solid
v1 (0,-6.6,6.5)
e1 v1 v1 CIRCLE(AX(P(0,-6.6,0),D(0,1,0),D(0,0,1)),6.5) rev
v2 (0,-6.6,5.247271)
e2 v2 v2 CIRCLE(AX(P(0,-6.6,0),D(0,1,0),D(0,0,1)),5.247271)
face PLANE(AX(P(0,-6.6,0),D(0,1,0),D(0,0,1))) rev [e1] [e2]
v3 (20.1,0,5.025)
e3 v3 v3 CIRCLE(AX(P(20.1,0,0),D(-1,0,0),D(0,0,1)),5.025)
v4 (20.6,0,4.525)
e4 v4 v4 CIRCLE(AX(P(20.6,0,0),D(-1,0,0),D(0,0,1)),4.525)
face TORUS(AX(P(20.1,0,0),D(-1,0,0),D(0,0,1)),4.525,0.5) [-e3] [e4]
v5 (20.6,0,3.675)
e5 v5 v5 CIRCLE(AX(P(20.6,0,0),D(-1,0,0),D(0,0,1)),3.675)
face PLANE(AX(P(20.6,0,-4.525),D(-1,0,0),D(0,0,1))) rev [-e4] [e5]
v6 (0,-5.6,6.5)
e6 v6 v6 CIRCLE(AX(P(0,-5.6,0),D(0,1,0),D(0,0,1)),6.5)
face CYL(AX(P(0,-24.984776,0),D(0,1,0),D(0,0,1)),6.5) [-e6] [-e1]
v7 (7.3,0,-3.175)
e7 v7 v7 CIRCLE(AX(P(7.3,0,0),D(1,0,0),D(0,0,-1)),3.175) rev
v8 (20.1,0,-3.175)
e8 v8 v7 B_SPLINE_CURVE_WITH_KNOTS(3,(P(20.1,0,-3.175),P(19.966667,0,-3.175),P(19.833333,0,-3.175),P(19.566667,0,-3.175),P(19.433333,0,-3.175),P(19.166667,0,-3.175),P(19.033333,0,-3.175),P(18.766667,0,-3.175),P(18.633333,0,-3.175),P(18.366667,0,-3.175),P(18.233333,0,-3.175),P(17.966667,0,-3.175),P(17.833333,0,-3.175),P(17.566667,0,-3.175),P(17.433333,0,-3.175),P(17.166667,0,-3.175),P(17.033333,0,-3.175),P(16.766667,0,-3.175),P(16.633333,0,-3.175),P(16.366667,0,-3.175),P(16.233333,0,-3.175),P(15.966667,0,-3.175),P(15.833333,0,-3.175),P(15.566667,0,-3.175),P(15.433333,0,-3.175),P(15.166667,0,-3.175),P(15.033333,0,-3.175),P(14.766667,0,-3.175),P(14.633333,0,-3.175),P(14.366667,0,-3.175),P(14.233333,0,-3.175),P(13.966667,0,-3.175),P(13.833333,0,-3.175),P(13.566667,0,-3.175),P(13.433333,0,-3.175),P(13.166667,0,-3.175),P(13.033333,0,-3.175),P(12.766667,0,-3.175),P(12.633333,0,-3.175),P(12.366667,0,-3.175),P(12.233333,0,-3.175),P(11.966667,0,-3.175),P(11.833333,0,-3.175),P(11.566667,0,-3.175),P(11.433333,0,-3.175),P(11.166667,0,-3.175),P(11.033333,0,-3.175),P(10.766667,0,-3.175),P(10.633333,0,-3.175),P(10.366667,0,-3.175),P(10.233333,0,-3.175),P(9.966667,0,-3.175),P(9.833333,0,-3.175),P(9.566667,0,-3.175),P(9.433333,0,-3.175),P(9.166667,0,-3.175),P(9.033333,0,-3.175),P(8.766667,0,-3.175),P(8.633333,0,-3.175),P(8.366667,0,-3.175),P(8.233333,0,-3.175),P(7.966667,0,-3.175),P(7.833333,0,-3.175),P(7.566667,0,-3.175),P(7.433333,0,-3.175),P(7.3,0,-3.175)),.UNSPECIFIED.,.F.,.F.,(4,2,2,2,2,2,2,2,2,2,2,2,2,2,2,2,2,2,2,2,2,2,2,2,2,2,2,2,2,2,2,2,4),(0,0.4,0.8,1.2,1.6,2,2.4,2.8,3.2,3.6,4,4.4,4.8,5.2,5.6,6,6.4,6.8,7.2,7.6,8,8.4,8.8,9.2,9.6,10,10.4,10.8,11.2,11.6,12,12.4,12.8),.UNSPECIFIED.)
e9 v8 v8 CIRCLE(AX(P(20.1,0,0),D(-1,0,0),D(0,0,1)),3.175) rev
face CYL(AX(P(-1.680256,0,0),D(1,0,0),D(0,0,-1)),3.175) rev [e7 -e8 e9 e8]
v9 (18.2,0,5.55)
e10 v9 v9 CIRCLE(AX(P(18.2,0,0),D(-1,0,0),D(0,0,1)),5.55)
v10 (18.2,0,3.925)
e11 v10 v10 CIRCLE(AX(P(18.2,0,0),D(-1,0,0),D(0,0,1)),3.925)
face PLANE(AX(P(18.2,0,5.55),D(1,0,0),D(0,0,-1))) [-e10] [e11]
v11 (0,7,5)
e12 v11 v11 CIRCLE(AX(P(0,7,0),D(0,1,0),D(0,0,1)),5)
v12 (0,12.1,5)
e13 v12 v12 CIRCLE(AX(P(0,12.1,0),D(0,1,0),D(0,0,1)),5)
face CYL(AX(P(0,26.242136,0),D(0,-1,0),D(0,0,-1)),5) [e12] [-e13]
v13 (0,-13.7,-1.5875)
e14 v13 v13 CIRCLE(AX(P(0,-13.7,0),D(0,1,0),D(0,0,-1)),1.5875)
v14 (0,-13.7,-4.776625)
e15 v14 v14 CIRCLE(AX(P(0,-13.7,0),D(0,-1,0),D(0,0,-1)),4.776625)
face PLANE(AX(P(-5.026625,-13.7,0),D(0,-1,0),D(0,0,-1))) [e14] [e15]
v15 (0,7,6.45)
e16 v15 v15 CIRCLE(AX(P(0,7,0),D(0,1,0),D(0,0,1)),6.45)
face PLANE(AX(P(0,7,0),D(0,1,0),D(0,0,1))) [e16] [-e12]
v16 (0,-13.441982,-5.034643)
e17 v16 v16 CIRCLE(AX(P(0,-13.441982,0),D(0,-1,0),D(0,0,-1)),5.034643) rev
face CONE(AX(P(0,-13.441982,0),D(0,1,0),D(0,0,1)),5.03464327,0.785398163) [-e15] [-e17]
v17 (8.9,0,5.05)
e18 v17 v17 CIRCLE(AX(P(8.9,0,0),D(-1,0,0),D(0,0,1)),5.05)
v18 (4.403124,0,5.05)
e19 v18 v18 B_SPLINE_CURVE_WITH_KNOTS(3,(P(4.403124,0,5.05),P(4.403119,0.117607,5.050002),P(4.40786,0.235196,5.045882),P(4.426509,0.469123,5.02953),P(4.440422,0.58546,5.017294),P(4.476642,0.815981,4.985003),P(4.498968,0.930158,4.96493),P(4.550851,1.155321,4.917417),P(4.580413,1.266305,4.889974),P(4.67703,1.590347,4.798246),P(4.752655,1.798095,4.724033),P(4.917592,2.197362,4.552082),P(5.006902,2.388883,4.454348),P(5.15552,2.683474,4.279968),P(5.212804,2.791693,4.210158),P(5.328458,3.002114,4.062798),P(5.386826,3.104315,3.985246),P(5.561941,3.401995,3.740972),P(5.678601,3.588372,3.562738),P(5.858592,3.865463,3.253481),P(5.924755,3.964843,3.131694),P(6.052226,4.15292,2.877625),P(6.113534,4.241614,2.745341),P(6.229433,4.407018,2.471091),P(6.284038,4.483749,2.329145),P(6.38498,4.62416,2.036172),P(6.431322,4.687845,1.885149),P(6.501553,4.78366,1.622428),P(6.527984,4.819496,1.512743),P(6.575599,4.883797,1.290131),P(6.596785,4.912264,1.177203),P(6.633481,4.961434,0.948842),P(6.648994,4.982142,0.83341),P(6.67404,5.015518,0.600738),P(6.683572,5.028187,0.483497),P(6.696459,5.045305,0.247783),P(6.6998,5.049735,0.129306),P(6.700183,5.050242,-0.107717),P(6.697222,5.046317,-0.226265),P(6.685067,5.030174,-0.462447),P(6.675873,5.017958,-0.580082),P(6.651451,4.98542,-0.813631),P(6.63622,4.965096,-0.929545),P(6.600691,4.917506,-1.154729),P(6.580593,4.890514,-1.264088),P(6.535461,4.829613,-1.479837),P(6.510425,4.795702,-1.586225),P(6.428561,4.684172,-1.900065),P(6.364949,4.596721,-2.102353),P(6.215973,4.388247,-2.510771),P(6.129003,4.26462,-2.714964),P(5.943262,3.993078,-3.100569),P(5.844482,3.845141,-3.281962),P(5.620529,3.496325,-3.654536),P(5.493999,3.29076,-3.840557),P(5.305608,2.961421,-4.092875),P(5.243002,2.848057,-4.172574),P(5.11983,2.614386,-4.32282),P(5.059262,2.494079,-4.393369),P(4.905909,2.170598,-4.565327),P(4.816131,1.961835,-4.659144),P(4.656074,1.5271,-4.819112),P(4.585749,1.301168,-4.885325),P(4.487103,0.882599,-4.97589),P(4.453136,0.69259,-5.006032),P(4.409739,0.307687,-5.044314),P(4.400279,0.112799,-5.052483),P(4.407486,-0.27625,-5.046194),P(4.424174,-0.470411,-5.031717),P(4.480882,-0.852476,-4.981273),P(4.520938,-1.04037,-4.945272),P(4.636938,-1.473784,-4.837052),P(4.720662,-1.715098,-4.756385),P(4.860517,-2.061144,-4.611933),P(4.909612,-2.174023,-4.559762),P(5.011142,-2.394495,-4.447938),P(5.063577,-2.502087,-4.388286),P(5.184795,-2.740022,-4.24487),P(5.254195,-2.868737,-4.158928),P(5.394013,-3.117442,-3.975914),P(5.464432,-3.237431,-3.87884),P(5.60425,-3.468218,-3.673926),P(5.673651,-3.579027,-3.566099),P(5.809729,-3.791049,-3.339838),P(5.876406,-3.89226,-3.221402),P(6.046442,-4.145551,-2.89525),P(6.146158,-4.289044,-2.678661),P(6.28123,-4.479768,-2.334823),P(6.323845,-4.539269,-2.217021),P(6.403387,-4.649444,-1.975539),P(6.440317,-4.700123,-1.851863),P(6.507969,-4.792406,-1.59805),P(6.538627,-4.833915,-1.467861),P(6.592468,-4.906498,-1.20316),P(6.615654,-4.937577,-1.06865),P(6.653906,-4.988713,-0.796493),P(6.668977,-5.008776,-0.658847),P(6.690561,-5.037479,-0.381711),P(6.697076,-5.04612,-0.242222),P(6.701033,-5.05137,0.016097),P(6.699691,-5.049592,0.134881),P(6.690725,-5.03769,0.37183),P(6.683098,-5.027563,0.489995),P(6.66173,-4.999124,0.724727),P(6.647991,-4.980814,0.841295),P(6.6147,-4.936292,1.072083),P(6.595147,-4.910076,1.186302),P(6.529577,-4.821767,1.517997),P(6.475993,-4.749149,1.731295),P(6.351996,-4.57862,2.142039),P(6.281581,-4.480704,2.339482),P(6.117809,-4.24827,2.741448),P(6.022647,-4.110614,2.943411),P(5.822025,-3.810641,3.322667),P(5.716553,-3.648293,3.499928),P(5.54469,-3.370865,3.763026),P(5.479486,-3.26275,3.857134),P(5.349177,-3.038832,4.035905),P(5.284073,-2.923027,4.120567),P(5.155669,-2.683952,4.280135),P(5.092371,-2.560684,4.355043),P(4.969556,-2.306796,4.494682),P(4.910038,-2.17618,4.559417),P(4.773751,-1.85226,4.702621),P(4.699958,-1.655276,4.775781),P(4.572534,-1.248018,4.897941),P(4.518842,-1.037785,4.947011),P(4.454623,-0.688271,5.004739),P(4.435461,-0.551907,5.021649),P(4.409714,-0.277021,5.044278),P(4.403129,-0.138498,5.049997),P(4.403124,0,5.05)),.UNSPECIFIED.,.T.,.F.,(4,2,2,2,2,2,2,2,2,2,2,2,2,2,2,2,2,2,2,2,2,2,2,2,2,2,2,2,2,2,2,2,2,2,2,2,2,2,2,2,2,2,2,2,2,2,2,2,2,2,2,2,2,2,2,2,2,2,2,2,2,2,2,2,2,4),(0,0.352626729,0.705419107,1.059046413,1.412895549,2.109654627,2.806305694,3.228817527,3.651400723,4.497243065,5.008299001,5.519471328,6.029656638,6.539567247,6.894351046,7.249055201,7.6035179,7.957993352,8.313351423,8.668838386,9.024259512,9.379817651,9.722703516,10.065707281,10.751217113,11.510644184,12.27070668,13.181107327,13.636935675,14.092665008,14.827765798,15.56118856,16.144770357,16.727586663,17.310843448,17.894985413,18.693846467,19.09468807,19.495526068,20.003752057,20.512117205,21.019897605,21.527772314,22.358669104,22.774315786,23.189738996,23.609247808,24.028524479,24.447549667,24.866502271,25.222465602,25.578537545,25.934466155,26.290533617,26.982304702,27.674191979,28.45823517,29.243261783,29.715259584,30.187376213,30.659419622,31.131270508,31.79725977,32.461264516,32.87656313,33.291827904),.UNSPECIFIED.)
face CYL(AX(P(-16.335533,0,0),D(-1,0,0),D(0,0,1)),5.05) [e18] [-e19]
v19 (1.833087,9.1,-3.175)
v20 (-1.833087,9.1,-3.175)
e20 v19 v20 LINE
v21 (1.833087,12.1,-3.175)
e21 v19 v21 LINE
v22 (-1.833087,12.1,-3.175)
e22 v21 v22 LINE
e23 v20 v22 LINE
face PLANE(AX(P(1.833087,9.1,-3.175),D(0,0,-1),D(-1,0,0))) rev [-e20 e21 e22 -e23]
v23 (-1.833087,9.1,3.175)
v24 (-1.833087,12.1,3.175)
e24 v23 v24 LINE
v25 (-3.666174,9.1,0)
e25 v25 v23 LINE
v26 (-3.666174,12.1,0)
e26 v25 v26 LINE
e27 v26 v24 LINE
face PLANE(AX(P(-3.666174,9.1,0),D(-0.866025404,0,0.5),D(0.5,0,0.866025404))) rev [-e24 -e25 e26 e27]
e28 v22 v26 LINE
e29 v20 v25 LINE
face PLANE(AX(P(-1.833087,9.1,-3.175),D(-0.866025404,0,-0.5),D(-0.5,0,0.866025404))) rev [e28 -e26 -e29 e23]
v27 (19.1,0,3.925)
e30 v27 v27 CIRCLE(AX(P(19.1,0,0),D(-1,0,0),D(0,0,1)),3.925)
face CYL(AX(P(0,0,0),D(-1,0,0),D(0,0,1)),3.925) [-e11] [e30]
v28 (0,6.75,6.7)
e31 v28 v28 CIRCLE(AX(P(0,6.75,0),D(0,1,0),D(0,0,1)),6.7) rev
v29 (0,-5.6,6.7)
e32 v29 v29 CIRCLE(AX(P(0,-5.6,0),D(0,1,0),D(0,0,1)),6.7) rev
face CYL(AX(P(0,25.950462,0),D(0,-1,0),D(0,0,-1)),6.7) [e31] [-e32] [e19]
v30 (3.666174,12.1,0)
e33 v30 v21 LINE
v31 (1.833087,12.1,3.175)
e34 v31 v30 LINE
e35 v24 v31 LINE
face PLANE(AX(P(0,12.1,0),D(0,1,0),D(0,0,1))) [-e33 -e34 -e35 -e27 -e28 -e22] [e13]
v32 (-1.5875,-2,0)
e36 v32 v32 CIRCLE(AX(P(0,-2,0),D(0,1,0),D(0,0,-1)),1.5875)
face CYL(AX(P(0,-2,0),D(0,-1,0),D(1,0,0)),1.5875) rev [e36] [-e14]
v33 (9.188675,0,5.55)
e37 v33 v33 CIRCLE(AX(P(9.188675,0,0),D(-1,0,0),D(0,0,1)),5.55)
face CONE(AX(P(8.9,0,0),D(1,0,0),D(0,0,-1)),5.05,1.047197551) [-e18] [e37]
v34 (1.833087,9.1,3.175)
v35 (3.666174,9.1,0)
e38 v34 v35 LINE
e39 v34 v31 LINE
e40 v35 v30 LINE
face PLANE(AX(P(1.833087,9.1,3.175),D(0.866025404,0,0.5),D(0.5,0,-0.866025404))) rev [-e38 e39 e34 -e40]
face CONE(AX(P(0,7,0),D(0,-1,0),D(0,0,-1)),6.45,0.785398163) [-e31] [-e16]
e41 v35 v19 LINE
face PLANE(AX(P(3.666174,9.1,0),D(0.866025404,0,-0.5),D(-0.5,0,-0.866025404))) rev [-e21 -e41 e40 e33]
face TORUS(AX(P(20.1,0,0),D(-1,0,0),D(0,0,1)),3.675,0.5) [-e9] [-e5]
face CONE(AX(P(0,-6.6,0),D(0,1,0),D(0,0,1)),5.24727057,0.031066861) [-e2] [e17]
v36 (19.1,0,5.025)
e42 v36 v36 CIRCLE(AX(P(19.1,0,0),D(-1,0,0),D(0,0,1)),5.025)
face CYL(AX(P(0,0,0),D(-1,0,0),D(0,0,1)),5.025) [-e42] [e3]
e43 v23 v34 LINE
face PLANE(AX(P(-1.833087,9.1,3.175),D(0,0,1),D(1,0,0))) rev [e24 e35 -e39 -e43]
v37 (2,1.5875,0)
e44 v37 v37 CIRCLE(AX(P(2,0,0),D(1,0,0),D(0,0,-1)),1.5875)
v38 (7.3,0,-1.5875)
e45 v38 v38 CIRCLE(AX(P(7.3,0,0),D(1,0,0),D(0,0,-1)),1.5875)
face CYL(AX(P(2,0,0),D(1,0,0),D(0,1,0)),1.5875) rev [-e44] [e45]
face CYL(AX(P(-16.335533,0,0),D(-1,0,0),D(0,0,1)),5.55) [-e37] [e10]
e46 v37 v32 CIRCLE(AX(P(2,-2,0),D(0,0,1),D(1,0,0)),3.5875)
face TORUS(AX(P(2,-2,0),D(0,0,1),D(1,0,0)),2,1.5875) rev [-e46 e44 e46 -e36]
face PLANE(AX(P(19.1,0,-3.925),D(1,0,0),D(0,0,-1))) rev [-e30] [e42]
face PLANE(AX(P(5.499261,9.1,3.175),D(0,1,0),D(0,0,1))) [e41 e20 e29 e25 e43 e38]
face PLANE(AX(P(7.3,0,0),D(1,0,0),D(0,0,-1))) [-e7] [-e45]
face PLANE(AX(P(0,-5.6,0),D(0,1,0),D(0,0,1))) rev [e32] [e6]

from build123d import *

# Parameters (mm, degrees)
CBODY_DEPTH            = 7
CBODY_DEPTH_BACK       = 5.6
CBODY_SKETCH_R         = 6.7
CBODY_CHAMFER_SIZE     = 0.25
THREAD_OFFSET_SKETCH_R = 6.5
THREAD_OFFSET_DEPTH    = 1
HEAD_SKETCH_R          = 5
HEAD_DEPTH             = 5.1
HEX_2_DEPTH            = 3
TUBE_START             = -13.3
TUBE_SKETCH_R          = 3.175
TUBE_DEPTH             = 13.3
TUBE_FILLET_R          = 0.5
PROFILE_PORT_R         = 1.5875


with BuildPart() as part:
    # CBody_Sketch → CBody (new, two sides: drawn at the far end of the back side and taken through both)
    with BuildSketch(Plane(origin=(0, 0, 0), x_dir=(1, 0, 0), z_dir=(0, 1, 0)).offset(-CBODY_DEPTH_BACK)):
        with Locations(Location((0, 0, 0), (0, 0, 270))):
            Circle(CBODY_SKETCH_R)
    extrude(amount=CBODY_DEPTH + CBODY_DEPTH_BACK)

    # CBody_Chamfer
    cbody_chamfer_edges = [part.edges().sort_by_distance(p)[0] for p in [
        (0, 7, -6.7),
    ]]
    chamfer(cbody_chamfer_edges, length=CBODY_CHAMFER_SIZE)

    # Thread_Offset_Sketch → Thread_Offset (add)
    with BuildSketch(Plane(origin=(0, -5.6, 0), x_dir=(-1, 0, 0), z_dir=(0, 1, 0))):
        with Locations(Location((0, 0, 0), (0, 0, 90))):
            Circle(THREAD_OFFSET_SKETCH_R)
    extrude(amount=-THREAD_OFFSET_DEPTH)

    # Thread_Sketch → Thread (revolve)
    with BuildSketch(Plane.XY, mode=Mode.PRIVATE) as thread_sk:
        Polygon((-5.24727057, -6.6), (-5.026624869, -13.7), (0, -13.7), (0, -6.6), align=None)
    revolve(thread_sk.sketch.rotate(Axis((0, 0, 0), (0, -1, 0)), 270), axis=Axis((0, 0, 0), (0, -1, 0)))

    # Thread_Chamfer: read off the stored shape, not the designer's step
    # Thread_Chamfer outline → Thread_Chamfer (revolve, cut)
    with BuildSketch(Plane.XY):
        Polygon((5.03464327, -13.441981598), (4.776624869, -13.7), (5.03464327, -13.7), align=None)
    revolve(axis=Axis((0, 0, 0), (0, 1, 0)), mode=Mode.SUBTRACT)

    # Head_Sketch → Head (add)
    with BuildSketch(Plane(origin=(0, 7, 0), x_dir=(-1, 0, 0), z_dir=(0, 1, 0))):
        with Locations(Location((0, 0, 0), (0, 0, 90))):
            Circle(HEAD_SKETCH_R)
    extrude(amount=HEAD_DEPTH)

    # Hex_Sketch → Hex 2 (cut)
    with BuildSketch(Plane(origin=(0, 12.1, 0), x_dir=(-1, 0, 0), z_dir=(0, 1, 0))):
        Polygon((-1.833087105, 3.175), (-3.666174209, 0), (-1.833087105, -3.175), (1.833087105, -3.175), (3.666174209, 0), (1.833087105, 3.175), align=None)
    extrude(amount=-HEX_2_DEPTH, mode=Mode.SUBTRACT)

    # RBody_Sketch → RBody (revolve)
    with BuildSketch(Plane(origin=(0, 0, 0), x_dir=(1, 0, 0), z_dir=(0, 1, 0))):
        Polygon((0, 0), (2.915618859, -5.05), (8.9, -5.05), (9.188675135, -5.55), (18.2, -5.55), (18.2, 0), align=None)
    revolve(axis=Axis((-16.33553342, 0, 0), (1, 0, 0)))

    # Release_Sketch → Release (revolve)
    with BuildSketch(Plane(origin=(0, 0, 0), x_dir=(1, 0, 0), z_dir=(0, 1, 0)), mode=Mode.PRIVATE) as release_sk:
        with BuildLine():
            Line((18.2, 0), (18.2, 3.925))
            Line((18.2, 3.925), (19.1, 3.925))
            Line((19.1, 3.925), (19.1, 5.025))
            Line((19.1, 5.025), (20.1, 5.025))
            ThreePointArc((20.1, 5.025), (20.453553391, 4.878553391), (20.6, 4.525))
            Line((20.6, 4.525), (20.6, 0))
            Line((20.6, 0), (18.2, 0))
        make_face()
    revolve(release_sk.sketch.rotate(Axis((0, 0, 0), (1, 0, 0)), 180), axis=Axis((0, 0, 0), (1, 0, 0)))

    # Tube_Sketch → Tube (cut)
    with BuildSketch(Plane(origin=(20.6, 0, 0), x_dir=(0, 0, -1), z_dir=(1, 0, 0)).offset(TUBE_START)):
        Circle(TUBE_SKETCH_R)
    extrude(amount=TUBE_DEPTH, mode=Mode.SUBTRACT)

    # Tube_Fillet
    tube_fillet_edges = [part.edges().sort_by_distance(p)[0] for p in [
        (20.6, 0, 3.175),
    ]]
    fillet(tube_fillet_edges, radius=TUBE_FILLET_R)

    # Port: sweep along a path in Path Port
    with BuildLine(Plane.XY) as port_path:
        Line((20.6, 0), (2, 0))
        ThreePointArc((2, 0), (0.585786438, -0.585786438), (0, -2))
        Line((0, -2), (0, -13.7))
    # Profile Port → Port (sweep, cut)
    with BuildSketch(Plane(origin=(20.6, 0, 0), x_dir=(0, 0, -1), z_dir=(1, 0, 0))):
        Circle(PROFILE_PORT_R)
    sweep(path=port_path.line, mode=Mode.SUBTRACT)


solid = part.part
